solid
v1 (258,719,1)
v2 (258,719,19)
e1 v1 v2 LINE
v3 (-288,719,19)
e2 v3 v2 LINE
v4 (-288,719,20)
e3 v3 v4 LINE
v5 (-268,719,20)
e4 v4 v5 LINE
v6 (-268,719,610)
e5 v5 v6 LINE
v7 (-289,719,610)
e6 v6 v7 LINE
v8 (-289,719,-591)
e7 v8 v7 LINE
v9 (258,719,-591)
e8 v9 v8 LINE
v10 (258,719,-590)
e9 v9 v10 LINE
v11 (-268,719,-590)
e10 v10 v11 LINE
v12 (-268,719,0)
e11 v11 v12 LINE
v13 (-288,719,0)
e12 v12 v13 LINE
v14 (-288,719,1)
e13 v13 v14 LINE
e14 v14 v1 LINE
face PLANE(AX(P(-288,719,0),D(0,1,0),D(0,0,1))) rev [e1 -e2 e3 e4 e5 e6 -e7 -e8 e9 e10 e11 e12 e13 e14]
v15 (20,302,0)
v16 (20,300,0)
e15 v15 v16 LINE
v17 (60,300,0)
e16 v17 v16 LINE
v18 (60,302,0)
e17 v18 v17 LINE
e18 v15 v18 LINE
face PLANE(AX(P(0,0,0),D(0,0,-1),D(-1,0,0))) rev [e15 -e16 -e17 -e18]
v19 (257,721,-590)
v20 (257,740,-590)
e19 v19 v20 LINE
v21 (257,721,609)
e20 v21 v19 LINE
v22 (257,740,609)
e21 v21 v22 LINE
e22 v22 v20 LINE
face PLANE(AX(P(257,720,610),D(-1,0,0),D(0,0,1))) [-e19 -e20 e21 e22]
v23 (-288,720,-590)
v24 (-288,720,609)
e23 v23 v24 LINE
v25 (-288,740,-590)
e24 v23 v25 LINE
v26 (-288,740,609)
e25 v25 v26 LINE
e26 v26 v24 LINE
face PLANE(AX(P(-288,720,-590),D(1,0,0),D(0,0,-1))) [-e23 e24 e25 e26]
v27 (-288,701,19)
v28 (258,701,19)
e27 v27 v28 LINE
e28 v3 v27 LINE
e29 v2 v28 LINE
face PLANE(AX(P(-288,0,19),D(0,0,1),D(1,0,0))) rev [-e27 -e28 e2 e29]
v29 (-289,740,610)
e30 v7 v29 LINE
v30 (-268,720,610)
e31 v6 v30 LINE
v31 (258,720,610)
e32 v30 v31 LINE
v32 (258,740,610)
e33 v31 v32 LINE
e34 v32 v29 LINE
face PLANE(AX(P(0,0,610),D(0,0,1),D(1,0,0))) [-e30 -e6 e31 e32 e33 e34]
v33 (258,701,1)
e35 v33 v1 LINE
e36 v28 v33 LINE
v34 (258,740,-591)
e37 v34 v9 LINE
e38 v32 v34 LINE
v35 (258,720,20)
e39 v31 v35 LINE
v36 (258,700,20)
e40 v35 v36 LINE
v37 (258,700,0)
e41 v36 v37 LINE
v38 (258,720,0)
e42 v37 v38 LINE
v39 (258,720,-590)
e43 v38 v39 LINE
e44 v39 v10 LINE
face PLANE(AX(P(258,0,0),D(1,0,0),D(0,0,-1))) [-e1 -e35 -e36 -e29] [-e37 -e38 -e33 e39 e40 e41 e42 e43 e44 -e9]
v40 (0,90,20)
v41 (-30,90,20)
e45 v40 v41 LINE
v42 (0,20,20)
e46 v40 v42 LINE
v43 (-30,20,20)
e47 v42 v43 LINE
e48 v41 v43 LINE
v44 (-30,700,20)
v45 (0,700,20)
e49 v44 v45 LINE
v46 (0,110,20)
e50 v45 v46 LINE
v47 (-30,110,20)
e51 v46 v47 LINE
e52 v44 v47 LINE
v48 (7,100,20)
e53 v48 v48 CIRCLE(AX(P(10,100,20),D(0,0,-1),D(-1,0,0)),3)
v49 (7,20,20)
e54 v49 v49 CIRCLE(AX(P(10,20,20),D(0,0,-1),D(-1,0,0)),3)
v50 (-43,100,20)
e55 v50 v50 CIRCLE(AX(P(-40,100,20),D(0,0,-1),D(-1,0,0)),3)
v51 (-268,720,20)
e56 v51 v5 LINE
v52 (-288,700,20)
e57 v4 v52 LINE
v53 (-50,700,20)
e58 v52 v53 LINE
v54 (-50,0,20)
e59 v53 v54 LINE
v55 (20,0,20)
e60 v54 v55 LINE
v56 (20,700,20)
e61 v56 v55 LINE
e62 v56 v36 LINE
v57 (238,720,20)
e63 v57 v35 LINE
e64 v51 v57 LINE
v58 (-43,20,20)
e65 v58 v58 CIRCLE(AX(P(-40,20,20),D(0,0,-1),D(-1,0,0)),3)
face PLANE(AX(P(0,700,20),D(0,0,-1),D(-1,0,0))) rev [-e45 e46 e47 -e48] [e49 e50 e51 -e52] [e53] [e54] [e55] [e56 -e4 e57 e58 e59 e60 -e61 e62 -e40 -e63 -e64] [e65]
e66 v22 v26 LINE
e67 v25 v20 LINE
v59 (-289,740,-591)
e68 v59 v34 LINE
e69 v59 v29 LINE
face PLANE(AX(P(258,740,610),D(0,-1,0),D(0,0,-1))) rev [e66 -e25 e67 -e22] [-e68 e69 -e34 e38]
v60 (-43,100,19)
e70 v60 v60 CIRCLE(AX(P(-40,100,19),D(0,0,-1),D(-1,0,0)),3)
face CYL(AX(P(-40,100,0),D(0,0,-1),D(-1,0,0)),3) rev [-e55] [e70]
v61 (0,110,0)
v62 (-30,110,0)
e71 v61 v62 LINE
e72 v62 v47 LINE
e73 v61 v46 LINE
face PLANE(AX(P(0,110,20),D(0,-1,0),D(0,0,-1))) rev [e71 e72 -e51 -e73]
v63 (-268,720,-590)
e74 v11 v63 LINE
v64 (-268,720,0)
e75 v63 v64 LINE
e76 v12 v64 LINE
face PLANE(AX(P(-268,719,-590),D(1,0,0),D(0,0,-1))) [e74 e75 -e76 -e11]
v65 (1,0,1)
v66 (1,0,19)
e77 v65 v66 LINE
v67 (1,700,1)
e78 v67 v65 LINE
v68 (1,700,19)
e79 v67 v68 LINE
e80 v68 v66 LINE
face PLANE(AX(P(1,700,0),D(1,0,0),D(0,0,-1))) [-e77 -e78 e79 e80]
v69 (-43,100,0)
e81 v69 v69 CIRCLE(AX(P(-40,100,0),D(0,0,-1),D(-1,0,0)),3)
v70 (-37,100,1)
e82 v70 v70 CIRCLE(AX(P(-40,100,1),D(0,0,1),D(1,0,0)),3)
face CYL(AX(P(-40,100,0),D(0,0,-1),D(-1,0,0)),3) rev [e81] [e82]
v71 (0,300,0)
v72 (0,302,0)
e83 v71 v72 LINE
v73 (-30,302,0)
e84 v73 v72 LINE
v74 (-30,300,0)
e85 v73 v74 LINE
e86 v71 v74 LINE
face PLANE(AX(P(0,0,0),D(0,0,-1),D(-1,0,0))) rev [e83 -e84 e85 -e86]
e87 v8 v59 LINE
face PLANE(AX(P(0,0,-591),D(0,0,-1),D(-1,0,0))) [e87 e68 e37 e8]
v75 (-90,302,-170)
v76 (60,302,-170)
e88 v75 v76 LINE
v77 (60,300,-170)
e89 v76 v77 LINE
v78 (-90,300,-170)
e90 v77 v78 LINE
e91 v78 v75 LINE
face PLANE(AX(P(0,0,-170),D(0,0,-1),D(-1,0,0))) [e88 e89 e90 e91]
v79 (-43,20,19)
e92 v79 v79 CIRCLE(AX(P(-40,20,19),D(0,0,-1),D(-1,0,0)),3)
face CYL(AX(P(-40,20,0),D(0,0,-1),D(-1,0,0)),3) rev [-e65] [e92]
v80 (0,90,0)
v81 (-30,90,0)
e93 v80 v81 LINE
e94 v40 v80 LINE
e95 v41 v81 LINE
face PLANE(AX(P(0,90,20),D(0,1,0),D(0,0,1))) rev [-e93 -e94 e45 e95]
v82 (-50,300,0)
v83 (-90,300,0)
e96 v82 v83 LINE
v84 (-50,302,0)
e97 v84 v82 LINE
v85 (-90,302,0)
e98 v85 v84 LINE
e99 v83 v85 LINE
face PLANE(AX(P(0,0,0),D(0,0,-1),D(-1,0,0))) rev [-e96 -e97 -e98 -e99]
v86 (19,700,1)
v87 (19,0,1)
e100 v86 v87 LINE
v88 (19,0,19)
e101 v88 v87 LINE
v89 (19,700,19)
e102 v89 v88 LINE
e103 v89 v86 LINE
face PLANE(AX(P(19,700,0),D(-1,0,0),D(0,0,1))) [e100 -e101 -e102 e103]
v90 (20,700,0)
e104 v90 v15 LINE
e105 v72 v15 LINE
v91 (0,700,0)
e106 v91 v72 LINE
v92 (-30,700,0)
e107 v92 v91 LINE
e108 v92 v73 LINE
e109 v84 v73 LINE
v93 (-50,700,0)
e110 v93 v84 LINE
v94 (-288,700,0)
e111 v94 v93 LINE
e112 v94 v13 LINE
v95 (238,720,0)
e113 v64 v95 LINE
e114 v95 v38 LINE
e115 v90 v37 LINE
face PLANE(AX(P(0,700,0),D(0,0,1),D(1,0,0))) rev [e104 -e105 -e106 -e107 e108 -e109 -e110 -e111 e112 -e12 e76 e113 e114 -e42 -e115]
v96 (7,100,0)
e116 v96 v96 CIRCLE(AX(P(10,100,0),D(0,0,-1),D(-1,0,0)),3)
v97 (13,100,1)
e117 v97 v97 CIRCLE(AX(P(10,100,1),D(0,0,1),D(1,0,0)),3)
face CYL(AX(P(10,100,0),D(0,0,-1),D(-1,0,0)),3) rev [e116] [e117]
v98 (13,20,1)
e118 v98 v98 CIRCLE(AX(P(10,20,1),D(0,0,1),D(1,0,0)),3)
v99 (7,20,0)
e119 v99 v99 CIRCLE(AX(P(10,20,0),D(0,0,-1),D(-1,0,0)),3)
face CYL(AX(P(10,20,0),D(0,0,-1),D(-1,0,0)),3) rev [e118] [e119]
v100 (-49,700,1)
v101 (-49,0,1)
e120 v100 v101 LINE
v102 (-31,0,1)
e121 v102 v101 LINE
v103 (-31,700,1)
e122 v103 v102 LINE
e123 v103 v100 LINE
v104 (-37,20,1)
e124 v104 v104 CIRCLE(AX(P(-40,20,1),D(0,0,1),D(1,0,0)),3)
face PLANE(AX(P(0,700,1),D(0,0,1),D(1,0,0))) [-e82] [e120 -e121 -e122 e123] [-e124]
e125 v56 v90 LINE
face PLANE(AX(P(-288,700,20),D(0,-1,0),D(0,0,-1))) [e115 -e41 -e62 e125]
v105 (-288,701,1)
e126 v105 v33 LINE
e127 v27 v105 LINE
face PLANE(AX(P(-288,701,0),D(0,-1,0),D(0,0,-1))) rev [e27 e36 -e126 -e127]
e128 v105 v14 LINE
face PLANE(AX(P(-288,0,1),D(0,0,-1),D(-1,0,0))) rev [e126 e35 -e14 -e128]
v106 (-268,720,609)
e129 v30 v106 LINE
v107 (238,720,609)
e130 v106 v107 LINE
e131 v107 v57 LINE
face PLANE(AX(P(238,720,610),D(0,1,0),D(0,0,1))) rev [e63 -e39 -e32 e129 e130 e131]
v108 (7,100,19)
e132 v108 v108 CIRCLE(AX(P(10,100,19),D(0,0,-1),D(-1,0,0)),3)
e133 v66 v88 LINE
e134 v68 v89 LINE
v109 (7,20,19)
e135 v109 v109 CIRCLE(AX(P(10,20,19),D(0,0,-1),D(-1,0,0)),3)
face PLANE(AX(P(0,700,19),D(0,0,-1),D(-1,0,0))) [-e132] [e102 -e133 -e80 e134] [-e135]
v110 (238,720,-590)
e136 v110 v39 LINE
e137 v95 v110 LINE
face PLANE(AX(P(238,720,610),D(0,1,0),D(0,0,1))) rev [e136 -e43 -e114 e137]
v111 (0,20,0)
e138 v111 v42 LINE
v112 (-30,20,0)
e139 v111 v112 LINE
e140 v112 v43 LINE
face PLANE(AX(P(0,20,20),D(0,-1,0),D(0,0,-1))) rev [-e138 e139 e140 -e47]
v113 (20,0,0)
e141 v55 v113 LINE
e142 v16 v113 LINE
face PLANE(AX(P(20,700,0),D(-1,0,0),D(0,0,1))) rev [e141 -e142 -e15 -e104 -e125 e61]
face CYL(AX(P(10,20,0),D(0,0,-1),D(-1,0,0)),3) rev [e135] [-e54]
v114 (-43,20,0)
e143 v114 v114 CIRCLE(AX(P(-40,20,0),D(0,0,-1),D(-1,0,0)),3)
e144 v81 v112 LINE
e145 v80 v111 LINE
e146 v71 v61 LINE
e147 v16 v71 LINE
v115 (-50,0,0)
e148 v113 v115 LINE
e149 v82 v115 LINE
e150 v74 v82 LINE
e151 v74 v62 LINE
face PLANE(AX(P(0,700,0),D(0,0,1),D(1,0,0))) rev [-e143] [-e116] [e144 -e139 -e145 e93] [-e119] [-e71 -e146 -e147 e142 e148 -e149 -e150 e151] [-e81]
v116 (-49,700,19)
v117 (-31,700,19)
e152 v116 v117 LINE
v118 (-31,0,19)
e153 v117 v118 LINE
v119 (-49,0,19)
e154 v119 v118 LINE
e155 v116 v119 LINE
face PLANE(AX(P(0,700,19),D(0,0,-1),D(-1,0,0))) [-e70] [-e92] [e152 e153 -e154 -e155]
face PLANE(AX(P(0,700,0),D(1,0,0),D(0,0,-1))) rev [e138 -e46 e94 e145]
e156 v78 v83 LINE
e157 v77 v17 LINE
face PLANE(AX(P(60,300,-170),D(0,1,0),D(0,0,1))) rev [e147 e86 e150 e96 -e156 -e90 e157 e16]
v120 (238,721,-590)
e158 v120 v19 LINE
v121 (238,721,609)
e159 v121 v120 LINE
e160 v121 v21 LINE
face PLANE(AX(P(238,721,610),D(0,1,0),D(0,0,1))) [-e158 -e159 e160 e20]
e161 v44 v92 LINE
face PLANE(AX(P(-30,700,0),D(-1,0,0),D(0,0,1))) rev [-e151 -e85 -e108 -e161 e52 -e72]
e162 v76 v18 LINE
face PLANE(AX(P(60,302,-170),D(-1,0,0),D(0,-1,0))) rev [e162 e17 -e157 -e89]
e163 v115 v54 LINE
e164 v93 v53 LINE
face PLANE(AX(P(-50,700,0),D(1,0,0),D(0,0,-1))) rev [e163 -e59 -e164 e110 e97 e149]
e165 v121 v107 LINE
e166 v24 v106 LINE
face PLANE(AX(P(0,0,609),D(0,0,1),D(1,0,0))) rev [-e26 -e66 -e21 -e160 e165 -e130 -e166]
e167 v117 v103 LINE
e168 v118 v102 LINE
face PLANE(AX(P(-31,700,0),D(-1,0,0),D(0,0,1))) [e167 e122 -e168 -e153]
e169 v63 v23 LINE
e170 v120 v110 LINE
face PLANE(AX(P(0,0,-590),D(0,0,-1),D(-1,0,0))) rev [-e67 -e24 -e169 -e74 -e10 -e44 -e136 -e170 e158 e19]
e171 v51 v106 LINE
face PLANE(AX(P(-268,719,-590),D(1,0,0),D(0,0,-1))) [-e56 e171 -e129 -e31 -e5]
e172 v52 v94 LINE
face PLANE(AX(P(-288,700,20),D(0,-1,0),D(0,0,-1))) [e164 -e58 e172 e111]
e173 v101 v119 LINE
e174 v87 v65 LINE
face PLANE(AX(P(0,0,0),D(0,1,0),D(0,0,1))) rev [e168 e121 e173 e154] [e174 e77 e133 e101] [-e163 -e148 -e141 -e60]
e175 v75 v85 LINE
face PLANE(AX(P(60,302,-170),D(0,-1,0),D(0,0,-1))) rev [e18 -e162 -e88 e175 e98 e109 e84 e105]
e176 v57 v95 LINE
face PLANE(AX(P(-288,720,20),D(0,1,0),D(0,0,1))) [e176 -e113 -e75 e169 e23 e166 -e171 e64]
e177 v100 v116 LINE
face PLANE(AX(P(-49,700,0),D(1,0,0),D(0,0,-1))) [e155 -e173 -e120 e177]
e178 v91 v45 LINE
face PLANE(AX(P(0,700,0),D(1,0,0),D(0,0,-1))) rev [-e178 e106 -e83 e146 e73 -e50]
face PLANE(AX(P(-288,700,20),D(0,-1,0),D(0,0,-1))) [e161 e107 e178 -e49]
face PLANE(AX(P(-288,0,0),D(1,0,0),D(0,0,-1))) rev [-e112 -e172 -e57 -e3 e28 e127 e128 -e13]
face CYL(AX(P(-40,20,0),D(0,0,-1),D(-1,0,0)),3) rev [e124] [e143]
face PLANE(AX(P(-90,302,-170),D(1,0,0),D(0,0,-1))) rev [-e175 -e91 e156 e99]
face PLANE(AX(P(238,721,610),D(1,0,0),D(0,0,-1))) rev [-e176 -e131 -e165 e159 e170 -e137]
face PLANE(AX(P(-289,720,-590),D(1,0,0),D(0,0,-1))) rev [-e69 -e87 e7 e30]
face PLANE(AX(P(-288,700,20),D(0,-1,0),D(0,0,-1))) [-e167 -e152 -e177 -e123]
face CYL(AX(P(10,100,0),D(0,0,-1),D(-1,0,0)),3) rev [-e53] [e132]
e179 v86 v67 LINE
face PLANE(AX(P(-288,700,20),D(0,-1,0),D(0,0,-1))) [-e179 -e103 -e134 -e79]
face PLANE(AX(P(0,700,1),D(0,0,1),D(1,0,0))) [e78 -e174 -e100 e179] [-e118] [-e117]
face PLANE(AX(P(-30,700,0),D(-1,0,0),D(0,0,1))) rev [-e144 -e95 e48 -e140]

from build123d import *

# Parameters (mm, degrees)
SKETCH1_W                = 20
SKETCH1_H                = 20
SKETCH1_W_2              = 18
SKETCH1_H_2              = 18
EXTRUDE_THIN1_DEPTH      = 700
EXTRUDE_THIN1_2_DEPTH    = 700
EXTRUDE_THIN2_DEPTH      = 238
EXTRUDE_THIN2_DEPTH_BACK = 308
SKETCH3_W                = 20
SKETCH3_H                = 20
SKETCH3_W_2              = 18
SKETCH3_H_2              = 18
F_6_0MM_DOWEL_HOLE1_D    = 6
EXTRUDE_THIN3_DEPTH      = 590
EXTRUDE_THIN3_DEPTH_BACK = 610
SKETCH8_W                = 547
SKETCH8_H                = 21
BOSS_EXTRUDE1_DEPTH      = 1
SKETCH9_W                = 547
SKETCH9_H                = 20
BOSS_EXTRUDE4_DEPTH      = 1
SKETCH10_W               = 20
SKETCH10_H               = 20
BOSS_EXTRUDE5_DEPTH      = 30
SKETCH11_W               = 150
SKETCH11_H               = 2
BOSS_EXTRUDE6_DEPTH      = 170


with BuildPart() as part:
    # Sketch1 → Extrude-Thin1 (new body)
    with BuildSketch(Plane(origin=(0, 0, 0), x_dir=(1, 0, 0), z_dir=(0, 1, 0))):
        with Locations((10, -10)):
            Rectangle(SKETCH1_W, SKETCH1_H)
        with Locations((10, -10)):
            Rectangle(SKETCH1_W_2, SKETCH1_H_2, mode=Mode.SUBTRACT)
    extrude(amount=EXTRUDE_THIN1_DEPTH)



with BuildPart() as body_2:
    # Sketch1 → Extrude-Thin1 2 (new body)
    with BuildSketch(Plane(origin=(0, 0, 0), x_dir=(1, 0, 0), z_dir=(0, 1, 0))):
        with Locations((-40, -10)):
            Rectangle(SKETCH1_W, SKETCH1_H)
        with Locations((-40, -10)):
            Rectangle(SKETCH1_W_2, SKETCH1_H_2, mode=Mode.SUBTRACT)
    extrude(amount=EXTRUDE_THIN1_2_DEPTH)


with BuildPart() as part_1:
    add(part.part)

    add(body_2.part)  # Extrude-Thin2 merges body 2
    # Sketch3 → Extrude-Thin2 (add, two sides: drawn at the far end of the back side and taken through both)
    with BuildSketch(Plane(origin=(20, 0, 0), x_dir=(0, 0, -1), z_dir=(1, 0, 0)).offset(-EXTRUDE_THIN2_DEPTH_BACK)):
        with Locations((-10, 710)):
            Rectangle(SKETCH3_W, SKETCH3_H)
        with Locations((-10, 710)):
            Rectangle(SKETCH3_W_2, SKETCH3_H_2, mode=Mode.SUBTRACT)
    extrude(amount=EXTRUDE_THIN2_DEPTH + EXTRUDE_THIN2_DEPTH_BACK)

    # Ø6.0mm Dowel Hole1 (through all)
    with Locations(Plane(origin=(0, 0, 0), x_dir=(-1, 0, 0), z_dir=(0, 0, -1))):
        with Locations((40, 20), (-10, 20), (-10, 100), (40, 100)):
            Hole(F_6_0MM_DOWEL_HOLE1_D / 2)

    # Sketch6 → Extrude-Thin3 (add, two sides: drawn at the far end of the back side and taken through both)
    with BuildSketch(Plane(origin=(0, 0, 0), x_dir=(-1, 0, 0), z_dir=(0, 0, -1)).offset(-EXTRUDE_THIN3_DEPTH_BACK)):
        Polygon((-238, 720), (-258, 720), (-258, 740), (-257, 740), (-257, 721), (-238, 721), align=None)
        Polygon((268, 720), (288, 720), (288, 740), (289, 740), (289, 719), (268, 719), align=None)
    extrude(amount=EXTRUDE_THIN3_DEPTH + EXTRUDE_THIN3_DEPTH_BACK)

    # Sketch8 → Boss-Extrude1 (add)
    with BuildSketch(Plane(origin=(0, 0, -590), x_dir=(-1, 0, 0), z_dir=(0, 0, -1))):
        with Locations((15.5, 729.5)):
            Rectangle(SKETCH8_W, SKETCH8_H)
    extrude(amount=BOSS_EXTRUDE1_DEPTH)

    # Sketch9 → Boss-Extrude4 (add)
    with BuildSketch(Plane.XY.offset(610)):
        with Locations((-15.5, 730)):
            Rectangle(SKETCH9_W, SKETCH9_H)
    extrude(amount=-BOSS_EXTRUDE4_DEPTH)

    # Sketch10 → Boss-Extrude5 (add)
    with BuildSketch(Plane(origin=(-30, 0, 0), x_dir=(0, 0, -1), z_dir=(1, 0, 0))):
        with Locations((-10, 10)):
            Rectangle(SKETCH10_W, SKETCH10_H)
        with Locations((-10, 100)):
            Rectangle(SKETCH10_W, SKETCH10_H)
    extrude(amount=BOSS_EXTRUDE5_DEPTH)

    # Sketch11 → Boss-Extrude6 (add)
    with BuildSketch(Plane(origin=(0, 0, 0), x_dir=(-1, 0, 0), z_dir=(0, 0, -1))):
        with Locations((15, 301)):
            Rectangle(SKETCH11_W, SKETCH11_H)
    extrude(amount=BOSS_EXTRUDE6_DEPTH)


solid = part_1.part
